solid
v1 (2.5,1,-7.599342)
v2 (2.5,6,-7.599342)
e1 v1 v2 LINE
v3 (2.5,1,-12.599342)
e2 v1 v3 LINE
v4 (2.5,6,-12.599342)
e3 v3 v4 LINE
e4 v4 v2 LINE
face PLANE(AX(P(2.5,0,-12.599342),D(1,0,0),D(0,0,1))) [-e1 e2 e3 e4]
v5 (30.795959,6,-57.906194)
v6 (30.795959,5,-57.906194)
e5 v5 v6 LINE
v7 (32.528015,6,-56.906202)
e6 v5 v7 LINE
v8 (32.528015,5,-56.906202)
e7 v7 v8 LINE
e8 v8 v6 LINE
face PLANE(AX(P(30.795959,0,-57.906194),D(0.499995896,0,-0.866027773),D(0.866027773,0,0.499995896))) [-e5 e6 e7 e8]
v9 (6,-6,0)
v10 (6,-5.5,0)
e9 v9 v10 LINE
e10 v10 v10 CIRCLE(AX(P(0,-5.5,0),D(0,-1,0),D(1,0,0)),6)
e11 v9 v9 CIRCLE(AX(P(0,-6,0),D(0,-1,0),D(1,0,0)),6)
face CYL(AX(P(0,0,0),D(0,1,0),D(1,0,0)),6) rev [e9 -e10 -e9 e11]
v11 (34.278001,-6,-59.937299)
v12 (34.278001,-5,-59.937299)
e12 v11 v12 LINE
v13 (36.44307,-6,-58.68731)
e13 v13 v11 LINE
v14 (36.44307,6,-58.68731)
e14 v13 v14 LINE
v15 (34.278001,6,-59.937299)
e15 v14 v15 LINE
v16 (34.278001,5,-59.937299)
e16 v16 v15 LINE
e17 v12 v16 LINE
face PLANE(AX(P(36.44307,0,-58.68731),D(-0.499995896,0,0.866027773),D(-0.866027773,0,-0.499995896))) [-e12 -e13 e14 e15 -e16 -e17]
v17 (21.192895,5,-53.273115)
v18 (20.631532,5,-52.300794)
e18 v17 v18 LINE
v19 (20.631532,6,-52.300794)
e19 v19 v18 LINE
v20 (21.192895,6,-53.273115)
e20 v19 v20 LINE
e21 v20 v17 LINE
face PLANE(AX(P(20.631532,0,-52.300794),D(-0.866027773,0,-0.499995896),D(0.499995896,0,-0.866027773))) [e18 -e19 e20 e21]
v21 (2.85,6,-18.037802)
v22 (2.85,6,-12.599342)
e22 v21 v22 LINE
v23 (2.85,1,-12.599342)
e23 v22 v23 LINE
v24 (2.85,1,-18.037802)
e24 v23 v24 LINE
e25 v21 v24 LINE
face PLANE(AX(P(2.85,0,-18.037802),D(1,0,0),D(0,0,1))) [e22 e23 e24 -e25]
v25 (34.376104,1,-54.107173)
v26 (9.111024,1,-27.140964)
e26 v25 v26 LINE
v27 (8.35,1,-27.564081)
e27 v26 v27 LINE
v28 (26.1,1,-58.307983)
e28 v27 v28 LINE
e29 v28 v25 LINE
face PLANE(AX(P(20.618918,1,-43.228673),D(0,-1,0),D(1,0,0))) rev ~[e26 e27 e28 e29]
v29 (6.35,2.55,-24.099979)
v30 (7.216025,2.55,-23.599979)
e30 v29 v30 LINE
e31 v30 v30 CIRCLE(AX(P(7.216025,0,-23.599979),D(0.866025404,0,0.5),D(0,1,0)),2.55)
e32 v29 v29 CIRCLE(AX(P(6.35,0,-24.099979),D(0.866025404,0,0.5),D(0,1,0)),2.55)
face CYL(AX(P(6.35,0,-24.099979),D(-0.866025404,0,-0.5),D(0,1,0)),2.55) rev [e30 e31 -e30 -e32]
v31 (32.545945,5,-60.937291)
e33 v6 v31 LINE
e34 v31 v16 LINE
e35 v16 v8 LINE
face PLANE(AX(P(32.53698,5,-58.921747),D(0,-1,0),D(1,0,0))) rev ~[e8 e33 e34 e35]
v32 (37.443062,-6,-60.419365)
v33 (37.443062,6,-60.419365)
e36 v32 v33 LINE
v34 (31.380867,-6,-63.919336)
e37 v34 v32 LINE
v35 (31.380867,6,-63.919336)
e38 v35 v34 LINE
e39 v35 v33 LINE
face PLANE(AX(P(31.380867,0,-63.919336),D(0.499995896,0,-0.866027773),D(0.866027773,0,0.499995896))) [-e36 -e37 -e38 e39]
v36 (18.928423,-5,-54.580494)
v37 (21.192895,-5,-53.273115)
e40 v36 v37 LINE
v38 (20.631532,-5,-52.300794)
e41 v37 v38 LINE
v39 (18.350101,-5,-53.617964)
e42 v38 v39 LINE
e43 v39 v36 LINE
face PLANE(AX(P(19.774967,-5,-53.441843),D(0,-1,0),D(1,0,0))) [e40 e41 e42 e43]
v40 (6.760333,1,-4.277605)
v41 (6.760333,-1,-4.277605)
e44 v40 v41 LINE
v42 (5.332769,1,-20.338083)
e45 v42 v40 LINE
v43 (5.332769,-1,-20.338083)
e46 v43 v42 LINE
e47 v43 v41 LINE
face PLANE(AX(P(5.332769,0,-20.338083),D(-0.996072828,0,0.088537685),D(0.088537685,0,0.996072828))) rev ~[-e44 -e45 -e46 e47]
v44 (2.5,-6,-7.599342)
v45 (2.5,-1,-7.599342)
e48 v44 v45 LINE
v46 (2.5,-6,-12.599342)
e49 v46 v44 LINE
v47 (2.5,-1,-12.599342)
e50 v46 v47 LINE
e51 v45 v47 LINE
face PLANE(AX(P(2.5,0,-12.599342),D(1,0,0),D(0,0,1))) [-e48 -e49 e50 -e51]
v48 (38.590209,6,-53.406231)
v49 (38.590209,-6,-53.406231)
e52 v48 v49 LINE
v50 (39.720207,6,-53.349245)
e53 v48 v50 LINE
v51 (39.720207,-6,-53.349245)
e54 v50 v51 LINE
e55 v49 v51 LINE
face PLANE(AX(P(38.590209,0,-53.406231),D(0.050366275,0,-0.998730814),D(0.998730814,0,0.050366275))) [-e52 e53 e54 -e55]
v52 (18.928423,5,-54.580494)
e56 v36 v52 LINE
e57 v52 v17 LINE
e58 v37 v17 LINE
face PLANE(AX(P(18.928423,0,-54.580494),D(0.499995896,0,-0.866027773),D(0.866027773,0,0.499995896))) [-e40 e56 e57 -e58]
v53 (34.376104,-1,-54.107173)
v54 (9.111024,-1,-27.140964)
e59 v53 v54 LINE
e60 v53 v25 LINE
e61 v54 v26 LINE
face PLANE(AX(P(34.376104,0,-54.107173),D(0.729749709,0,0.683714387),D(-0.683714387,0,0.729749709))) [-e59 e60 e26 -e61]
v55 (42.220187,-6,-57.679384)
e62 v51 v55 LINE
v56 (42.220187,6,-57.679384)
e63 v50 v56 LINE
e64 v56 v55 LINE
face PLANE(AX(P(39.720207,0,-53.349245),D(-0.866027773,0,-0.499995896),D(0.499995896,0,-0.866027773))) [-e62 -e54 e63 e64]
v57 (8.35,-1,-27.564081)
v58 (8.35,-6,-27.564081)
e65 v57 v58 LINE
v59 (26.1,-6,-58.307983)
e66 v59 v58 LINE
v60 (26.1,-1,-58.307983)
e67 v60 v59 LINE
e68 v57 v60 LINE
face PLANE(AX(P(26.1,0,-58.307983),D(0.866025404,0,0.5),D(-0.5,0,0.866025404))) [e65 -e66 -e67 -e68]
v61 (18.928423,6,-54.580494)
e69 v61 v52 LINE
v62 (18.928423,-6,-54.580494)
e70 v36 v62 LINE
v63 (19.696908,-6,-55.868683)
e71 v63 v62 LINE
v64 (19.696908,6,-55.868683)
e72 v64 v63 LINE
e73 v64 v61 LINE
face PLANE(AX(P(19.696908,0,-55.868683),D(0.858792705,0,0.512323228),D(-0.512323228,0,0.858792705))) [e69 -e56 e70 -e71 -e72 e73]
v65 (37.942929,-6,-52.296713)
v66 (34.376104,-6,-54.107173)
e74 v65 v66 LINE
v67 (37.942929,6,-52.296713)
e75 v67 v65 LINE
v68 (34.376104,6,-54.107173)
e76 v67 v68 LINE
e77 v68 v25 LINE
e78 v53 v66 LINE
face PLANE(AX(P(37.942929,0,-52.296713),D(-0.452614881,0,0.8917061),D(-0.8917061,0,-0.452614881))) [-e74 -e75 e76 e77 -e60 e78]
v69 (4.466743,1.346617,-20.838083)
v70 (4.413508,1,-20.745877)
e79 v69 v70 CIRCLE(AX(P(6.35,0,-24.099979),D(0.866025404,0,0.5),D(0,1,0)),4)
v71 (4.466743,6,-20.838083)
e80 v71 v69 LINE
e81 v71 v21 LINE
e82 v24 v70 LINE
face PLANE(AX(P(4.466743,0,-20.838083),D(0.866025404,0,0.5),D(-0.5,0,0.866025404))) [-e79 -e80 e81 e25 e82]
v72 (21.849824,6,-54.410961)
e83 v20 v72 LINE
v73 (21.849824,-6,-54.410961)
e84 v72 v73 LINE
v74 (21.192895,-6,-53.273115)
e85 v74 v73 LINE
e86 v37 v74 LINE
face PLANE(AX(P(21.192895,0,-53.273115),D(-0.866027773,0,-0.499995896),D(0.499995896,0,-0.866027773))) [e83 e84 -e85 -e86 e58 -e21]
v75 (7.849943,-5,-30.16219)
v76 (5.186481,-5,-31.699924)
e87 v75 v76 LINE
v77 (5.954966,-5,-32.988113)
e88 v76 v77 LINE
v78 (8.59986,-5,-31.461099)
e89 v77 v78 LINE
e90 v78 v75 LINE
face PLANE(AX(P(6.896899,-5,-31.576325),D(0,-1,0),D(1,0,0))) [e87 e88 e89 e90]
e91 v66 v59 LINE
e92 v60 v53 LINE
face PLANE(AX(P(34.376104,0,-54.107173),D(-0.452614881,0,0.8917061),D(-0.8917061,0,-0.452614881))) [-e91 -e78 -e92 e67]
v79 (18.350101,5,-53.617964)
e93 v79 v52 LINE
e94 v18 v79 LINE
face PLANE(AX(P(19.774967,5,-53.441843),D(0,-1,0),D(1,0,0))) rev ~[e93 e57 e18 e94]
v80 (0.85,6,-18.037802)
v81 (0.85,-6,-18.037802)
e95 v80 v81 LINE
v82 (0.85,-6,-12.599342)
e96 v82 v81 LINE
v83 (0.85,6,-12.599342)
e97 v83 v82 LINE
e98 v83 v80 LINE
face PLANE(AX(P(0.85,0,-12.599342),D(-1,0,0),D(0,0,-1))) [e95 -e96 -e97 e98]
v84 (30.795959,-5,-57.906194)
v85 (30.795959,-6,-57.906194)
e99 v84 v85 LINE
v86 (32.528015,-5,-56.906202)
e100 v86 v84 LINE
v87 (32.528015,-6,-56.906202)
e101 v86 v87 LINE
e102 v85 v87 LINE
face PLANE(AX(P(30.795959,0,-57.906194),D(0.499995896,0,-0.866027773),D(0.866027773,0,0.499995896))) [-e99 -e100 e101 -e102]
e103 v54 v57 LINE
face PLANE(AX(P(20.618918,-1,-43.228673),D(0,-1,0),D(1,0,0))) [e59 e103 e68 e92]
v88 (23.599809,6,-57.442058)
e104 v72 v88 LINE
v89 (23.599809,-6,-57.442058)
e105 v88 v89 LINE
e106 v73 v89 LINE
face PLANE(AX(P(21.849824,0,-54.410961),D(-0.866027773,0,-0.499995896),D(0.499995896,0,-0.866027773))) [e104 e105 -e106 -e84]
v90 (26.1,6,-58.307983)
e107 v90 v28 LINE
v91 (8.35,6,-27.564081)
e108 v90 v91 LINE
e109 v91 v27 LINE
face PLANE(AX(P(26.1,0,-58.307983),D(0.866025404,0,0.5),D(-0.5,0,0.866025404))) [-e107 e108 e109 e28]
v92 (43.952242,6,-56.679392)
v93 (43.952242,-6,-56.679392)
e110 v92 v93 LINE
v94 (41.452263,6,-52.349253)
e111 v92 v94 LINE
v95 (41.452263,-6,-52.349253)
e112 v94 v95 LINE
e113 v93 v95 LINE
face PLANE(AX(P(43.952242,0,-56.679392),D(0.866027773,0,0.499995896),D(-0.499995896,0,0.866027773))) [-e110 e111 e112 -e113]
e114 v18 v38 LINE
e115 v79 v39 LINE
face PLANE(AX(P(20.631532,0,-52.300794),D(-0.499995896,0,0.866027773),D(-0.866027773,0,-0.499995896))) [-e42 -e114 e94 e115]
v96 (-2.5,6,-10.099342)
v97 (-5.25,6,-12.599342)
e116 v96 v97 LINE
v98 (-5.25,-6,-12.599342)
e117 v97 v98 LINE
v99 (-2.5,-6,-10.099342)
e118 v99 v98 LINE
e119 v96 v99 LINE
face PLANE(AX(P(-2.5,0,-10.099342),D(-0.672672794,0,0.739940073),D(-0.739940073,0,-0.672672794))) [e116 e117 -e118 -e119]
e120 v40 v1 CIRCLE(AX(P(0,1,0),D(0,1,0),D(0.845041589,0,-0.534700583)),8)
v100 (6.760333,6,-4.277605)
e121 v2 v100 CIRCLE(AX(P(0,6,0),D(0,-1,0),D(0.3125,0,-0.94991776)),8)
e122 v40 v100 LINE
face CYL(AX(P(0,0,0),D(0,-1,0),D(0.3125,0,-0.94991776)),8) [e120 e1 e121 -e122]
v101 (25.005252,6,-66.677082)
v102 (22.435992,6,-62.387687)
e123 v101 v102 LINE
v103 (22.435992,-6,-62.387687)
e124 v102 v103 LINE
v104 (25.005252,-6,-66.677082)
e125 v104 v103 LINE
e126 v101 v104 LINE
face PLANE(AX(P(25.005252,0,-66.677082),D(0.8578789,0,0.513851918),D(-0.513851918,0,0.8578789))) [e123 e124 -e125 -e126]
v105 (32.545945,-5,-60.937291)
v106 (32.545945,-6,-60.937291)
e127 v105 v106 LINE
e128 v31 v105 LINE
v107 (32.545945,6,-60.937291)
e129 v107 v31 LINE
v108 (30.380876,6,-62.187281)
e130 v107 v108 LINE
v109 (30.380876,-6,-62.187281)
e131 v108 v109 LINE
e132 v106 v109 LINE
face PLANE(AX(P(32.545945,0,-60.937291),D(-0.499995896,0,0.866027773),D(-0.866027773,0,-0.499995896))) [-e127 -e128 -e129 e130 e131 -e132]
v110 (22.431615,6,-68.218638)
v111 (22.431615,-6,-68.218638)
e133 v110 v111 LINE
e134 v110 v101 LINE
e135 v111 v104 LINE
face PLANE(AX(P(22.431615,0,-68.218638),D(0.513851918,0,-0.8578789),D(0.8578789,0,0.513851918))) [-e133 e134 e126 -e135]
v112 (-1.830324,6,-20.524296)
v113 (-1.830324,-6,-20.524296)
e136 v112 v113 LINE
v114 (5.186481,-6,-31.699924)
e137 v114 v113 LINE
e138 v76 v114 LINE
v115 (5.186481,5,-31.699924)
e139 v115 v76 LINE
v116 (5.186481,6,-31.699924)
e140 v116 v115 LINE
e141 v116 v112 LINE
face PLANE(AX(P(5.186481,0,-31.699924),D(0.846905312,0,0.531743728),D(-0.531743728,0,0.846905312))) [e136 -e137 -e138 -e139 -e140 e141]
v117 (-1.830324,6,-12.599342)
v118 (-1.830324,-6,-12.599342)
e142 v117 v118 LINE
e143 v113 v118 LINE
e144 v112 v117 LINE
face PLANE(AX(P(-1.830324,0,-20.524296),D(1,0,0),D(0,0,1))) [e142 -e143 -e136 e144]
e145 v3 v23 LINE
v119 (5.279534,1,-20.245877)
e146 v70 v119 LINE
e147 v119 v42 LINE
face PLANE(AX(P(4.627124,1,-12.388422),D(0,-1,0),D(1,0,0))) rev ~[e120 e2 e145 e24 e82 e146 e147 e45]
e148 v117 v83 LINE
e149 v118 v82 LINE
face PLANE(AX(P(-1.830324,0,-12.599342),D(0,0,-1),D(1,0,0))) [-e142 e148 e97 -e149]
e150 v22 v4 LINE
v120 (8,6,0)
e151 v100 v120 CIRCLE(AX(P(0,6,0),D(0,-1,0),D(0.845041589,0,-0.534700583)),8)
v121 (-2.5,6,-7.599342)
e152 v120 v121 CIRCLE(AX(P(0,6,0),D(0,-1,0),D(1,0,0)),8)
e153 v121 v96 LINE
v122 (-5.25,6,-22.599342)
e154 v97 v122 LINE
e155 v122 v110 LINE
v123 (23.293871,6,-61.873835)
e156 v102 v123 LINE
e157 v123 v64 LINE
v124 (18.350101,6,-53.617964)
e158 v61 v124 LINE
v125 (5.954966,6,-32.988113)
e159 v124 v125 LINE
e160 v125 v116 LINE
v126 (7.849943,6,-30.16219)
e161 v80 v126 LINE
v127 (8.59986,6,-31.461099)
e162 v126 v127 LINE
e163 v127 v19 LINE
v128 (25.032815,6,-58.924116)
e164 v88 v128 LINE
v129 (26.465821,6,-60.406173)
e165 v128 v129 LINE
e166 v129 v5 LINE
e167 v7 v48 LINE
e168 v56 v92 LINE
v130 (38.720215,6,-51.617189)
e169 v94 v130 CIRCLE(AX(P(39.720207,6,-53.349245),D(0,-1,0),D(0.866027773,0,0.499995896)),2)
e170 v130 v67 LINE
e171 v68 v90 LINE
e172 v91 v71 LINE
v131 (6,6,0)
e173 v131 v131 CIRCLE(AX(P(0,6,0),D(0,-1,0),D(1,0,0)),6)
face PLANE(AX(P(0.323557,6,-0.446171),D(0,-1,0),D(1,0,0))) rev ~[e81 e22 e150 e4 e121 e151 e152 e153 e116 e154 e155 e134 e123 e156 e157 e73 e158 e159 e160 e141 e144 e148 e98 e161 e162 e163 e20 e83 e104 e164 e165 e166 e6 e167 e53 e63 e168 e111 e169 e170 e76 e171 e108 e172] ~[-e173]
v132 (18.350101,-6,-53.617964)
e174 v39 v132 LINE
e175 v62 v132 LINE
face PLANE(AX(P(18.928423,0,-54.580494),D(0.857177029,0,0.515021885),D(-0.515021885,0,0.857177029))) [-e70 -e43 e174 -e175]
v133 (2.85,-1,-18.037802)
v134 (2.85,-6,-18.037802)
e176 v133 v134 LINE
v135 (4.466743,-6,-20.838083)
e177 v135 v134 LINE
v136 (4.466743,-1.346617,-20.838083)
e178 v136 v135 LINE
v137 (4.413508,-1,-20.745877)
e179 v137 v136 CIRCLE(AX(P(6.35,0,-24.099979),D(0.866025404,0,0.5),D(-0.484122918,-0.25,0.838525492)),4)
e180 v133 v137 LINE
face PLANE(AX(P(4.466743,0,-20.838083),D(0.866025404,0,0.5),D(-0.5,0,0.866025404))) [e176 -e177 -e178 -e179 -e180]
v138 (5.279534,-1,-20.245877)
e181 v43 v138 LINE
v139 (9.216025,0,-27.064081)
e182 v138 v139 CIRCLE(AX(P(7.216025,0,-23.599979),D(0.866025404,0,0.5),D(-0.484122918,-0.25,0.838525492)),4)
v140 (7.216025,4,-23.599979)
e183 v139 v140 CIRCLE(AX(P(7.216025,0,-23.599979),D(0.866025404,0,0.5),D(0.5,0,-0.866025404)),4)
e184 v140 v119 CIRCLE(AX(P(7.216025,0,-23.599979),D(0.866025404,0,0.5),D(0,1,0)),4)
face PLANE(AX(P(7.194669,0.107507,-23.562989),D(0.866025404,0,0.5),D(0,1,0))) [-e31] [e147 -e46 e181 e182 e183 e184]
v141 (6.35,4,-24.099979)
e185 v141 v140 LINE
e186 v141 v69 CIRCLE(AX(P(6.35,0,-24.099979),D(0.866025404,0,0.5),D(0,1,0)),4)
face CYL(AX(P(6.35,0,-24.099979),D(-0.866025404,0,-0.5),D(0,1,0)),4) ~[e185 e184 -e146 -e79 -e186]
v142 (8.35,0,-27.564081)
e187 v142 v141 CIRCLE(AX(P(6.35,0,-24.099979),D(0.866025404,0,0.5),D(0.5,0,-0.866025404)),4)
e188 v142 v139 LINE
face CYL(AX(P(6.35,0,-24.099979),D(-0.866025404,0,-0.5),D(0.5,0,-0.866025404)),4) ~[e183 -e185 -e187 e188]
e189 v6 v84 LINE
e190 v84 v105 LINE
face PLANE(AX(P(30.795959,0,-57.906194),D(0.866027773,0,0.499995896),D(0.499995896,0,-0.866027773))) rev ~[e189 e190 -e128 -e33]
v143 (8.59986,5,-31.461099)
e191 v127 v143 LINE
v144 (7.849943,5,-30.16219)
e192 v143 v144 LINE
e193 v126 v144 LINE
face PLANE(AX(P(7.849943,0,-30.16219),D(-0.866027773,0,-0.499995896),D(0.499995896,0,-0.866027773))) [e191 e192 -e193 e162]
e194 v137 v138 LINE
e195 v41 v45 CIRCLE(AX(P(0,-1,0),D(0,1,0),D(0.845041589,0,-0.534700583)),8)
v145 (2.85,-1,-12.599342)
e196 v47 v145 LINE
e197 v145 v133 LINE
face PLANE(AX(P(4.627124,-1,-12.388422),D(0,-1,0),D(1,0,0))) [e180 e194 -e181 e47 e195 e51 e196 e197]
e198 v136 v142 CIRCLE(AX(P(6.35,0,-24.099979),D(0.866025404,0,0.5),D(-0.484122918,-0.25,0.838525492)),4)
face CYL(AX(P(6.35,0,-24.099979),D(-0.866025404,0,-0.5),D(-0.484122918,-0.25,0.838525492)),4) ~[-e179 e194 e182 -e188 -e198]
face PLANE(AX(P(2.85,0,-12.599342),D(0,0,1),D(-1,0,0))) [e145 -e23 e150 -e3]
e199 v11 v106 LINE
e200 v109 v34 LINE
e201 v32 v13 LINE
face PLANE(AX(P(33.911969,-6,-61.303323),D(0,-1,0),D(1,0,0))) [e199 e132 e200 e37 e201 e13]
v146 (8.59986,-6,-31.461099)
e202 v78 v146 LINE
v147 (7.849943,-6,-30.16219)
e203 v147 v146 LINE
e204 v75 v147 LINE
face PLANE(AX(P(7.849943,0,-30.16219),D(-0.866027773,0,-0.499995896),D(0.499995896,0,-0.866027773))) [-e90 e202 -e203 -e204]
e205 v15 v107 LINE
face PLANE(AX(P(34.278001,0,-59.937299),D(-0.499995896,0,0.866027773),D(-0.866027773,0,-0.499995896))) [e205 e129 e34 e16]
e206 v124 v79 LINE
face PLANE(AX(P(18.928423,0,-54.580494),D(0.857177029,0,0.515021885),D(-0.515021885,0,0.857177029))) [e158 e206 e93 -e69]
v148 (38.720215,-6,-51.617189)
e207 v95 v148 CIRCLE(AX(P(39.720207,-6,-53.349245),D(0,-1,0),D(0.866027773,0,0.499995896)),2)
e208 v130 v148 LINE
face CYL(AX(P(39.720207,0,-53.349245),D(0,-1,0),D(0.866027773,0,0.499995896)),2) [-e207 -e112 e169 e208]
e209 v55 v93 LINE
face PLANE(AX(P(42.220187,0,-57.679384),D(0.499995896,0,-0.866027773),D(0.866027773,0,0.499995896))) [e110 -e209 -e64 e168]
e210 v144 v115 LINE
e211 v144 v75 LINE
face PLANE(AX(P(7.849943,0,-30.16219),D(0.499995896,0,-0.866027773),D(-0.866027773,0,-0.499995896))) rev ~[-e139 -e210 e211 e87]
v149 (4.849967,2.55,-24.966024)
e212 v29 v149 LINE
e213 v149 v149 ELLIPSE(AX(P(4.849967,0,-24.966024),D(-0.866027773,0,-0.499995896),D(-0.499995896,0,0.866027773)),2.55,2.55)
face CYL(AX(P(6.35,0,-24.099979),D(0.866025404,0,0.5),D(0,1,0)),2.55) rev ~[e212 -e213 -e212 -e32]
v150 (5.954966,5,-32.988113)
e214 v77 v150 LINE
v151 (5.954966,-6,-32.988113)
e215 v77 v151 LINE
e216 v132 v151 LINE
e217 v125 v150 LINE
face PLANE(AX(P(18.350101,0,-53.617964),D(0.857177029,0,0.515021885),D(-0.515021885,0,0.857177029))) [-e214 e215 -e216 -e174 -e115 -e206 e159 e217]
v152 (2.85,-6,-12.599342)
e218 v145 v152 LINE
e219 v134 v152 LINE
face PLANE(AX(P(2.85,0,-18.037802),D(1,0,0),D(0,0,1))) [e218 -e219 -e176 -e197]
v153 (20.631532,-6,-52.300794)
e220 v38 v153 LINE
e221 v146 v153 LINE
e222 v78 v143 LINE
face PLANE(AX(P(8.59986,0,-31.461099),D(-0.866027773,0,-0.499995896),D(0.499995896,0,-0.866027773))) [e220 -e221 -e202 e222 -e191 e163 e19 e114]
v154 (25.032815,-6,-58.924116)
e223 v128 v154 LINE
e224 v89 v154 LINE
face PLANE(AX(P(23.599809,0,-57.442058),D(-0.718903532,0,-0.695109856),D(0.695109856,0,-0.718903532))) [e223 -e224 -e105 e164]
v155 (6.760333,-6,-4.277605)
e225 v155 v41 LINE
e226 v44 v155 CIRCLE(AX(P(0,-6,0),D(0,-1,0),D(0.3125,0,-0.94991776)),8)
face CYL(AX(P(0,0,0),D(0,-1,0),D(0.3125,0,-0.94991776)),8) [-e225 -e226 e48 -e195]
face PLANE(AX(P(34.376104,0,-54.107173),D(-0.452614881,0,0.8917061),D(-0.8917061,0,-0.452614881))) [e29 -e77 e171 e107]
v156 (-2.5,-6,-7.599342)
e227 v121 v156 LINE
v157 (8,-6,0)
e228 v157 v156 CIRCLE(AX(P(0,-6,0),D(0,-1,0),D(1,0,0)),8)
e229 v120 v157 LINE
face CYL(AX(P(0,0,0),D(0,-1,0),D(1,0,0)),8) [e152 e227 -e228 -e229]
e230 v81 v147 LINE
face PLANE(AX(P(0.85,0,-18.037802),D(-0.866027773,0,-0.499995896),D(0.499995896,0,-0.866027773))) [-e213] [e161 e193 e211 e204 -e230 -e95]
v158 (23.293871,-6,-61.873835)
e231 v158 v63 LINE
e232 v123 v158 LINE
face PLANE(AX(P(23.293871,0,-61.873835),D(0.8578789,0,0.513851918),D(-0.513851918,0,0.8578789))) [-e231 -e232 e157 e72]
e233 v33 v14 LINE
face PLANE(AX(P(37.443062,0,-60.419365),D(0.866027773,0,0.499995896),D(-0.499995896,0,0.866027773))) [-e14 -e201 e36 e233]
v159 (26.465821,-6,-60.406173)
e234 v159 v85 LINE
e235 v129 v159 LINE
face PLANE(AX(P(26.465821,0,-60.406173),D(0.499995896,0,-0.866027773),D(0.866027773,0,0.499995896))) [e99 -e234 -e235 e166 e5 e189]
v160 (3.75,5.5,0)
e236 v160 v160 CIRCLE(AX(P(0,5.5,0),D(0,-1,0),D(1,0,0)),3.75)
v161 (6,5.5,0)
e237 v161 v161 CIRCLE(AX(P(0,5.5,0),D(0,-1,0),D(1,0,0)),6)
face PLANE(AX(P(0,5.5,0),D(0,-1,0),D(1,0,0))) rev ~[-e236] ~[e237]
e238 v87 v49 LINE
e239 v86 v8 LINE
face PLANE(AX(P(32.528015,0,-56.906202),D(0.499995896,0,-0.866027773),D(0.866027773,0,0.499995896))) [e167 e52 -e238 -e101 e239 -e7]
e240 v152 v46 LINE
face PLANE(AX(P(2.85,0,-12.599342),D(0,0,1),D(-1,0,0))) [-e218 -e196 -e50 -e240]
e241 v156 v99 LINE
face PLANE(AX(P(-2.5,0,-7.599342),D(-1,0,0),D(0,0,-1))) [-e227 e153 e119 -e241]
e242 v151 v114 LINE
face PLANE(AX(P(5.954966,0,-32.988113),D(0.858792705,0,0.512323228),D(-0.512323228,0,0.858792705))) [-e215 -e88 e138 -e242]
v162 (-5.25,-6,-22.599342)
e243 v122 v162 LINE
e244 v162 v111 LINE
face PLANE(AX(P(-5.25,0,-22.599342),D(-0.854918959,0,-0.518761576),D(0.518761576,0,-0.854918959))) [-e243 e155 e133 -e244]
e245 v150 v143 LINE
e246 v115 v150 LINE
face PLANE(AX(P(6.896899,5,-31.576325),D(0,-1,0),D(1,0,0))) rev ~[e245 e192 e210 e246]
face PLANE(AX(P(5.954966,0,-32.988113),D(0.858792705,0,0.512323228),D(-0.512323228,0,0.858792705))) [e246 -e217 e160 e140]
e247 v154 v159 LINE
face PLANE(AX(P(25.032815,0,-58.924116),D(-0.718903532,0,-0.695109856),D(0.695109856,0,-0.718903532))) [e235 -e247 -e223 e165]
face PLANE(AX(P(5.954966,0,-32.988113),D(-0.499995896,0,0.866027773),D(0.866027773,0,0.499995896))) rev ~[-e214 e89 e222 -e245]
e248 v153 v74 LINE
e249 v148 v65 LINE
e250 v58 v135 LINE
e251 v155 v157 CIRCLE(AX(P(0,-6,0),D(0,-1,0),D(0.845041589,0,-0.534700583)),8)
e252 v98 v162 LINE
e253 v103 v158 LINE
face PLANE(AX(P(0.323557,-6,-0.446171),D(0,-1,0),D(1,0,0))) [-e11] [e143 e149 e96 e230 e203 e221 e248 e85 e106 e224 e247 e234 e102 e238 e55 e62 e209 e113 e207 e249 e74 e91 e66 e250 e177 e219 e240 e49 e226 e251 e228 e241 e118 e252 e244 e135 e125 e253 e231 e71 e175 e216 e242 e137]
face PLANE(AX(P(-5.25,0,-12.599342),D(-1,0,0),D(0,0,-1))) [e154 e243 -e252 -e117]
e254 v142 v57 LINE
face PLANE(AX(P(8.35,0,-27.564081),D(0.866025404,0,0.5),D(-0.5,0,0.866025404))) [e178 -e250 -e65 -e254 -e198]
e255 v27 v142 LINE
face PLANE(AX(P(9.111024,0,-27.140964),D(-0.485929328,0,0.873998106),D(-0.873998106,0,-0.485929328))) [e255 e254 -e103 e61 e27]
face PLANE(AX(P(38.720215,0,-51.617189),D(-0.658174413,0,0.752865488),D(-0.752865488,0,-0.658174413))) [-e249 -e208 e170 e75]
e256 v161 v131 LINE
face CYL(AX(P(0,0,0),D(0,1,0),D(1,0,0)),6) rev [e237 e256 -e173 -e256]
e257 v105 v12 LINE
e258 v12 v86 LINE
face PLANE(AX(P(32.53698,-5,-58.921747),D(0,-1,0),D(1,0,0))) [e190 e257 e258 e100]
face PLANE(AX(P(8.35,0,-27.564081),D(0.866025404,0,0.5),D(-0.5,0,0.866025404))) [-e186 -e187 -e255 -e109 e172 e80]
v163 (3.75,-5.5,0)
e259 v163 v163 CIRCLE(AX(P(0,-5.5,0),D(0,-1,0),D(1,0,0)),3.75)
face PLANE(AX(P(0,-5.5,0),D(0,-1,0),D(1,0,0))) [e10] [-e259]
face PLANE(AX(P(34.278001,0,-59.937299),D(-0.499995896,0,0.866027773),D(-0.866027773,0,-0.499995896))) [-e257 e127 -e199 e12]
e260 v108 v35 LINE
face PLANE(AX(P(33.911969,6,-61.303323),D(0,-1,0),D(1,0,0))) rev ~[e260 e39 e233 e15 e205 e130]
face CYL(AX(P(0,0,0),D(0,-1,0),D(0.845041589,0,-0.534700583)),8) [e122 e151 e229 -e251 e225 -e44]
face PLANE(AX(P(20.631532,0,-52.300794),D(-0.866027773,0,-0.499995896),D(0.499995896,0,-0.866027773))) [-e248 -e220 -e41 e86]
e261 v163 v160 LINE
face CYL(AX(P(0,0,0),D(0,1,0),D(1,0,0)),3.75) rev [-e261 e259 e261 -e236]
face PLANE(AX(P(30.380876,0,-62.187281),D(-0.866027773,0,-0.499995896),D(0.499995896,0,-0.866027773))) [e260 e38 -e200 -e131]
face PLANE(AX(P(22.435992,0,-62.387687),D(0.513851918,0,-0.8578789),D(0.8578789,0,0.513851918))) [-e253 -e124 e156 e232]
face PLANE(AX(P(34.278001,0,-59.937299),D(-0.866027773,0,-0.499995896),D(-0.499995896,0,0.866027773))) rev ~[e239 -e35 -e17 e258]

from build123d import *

# Parameters (mm, degrees)
F0_R     = 6
F1_DEPTH = 6
F2_DEPTH = 5
F0_R_2   = 3.75
F3_DEPTH = 5.5
F4_DEPTH = 1
F5_R     = 2.55
F6_DEPTH = 1
F7_DEPTH = 3


# Not quite as in the source:
# - a feature names something its author has since deleted; it is built from what else it names


with BuildPart() as f1:
    # F0 (on Front) → F1 (new body, symmetric)
    with BuildSketch(Plane.XZ):
        with BuildLine():
            ThreePointArc((6.7603327111, -4.2776046609), (7.6838356857, -2.2268069417), (8, 0))
            ThreePointArc((8, 0), (-4.6904157598, 6.4807406984), (-2.5, -7.5993420768))
            ThreePointArc((-2.5, -7.5993420768), (0, -8), (2.5, -7.5993420768))
            ThreePointArc((2.5, -7.5993420768), (4.9190370343, -6.3089677963), (6.7603327111, -4.2776046609))
        make_face()
        Circle(F0_R, mode=Mode.SUBTRACT)
        with BuildLine():
            ThreePointArc((2.5, -7.5993420768), (0, -8), (-2.5, -7.5993420768))
            Line((-2.5, -7.5993420768), (-2.5, -10.0993420768))
            Line((-2.5, -10.0993420768), (-2.5, -12.5993420768))
            Line((-2.5, -12.5993420768), (-1.8303241628, -12.5993420768))
            Line((-1.8303241628, -12.5993420768), (-1.25, -12.5993420768))
            Line((-1.25, -12.5993420768), (0, -12.5993420768))
            Line((0, -12.5993420768), (0.85, -12.5993420768))
            Line((0.85, -12.5993420768), (2.5, -12.5993420768))
            Line((2.5, -12.5993420768), (2.5, -7.5993420768))
        make_face()
        Polygon((-2.5, -12.5993420768), (-2.5, -10.0993420768), (-5.25, -12.5993420768), align=None)
        Polygon((2.85, -12.5993420768), (2.5, -12.5993420768), (0.85, -12.5993420768), (0.85, -18.0378015974), (2.85, -18.0378015974), align=None)
        Polygon((8.3499999998, -27.5640810386), (4.4667434126, -20.8380833309), (2.85, -18.0378015974), (0.85, -18.0378015974), (7.8499425387, -30.1621904255), (8.5998597667, -31.4610993824), (20.6315315697, -52.3007943349), (21.192894901, -53.2731147882), (21.8498235115, -54.4109609722), (23.5998091461, -57.4420581792), (25.0328148241, -58.9241157783), (26.1, -58.3079828733), align=None)
        with BuildLine():
            ThreePointArc((41.4522628248, -52.3492529341), (40.2378545238, -51.4173955261), (38.7202154867, -51.6171891785))
            Line((38.7202154867, -51.6171891785), (39.720207278, -53.3492447254))
            Line((39.720207278, -53.3492447254), (41.4522628248, -52.3492529341))
        make_face()
        Polygon((41.4522628248, -52.3492529341), (39.720207278, -53.3492447254), (42.2201867561, -57.6793835925), (43.9522423029, -56.6793918013), align=None)
        Polygon((-1.8303241628, -12.5993420768), (-2.5, -12.5993420768), (-5.25, -12.5993420768), (-5.25, -22.5993420768), (-1.8303241628, -20.5242957716), align=None)
        Polygon((-1.8303241628, -20.5242957716), (-5.25, -22.5993420768), (22.4316151512, -68.2186375255), (25.0052518507, -66.6770817727), (22.4359922626, -62.3876872736), (23.2938711624, -61.8738353559), (19.6969077391, -55.8686830572), (18.9284228965, -54.5804940001), (18.3501014099, -53.6179642353), (5.9549663233, -32.9881126107), (5.1864814807, -31.6999235536), align=None)
        Polygon((34.376104393, -54.107172761), (26.1, -58.3079828733), (25.0328148241, -58.9241157783), (26.4658205021, -60.4061733773), (30.7959593692, -57.9061938992), (32.5280149161, -56.906202108), (38.5902093302, -53.4062308387), (39.720207278, -53.3492447254), (38.7202154867, -51.6171891785), (37.9429287948, -52.2967132374), align=None)
    extrude(amount=F1_DEPTH, both=True)



with BuildPart() as f1b:
    # F0 (on Front) → F1, piece 2 (new body, symmetric)
    with BuildSketch(Plane.XZ):
        Polygon((34.2780005508, -59.937299315), (32.5459450039, -60.9372911063), (30.3808755703, -62.1872808453), (31.3808673616, -63.9193363922), (37.4430617756, -60.4193651228), (36.4430699844, -58.687309576), align=None)
    extrude(amount=F1_DEPTH, both=True)


with BuildPart() as f1_1:
    add(f1.part)

    add(f1b.part)  # F2 merges F1b
    # F0 (on Front) → F2 (join, symmetric)
    with BuildSketch(Plane.XZ):
        Polygon((32.5280149161, -56.906202108), (30.7959593692, -57.9061938992), (32.5459450039, -60.9372911063), (34.2780005508, -59.937299315), align=None)
        Polygon((8.5998597667, -31.4610993824), (7.8499425387, -30.1621904255), (5.1864814807, -31.6999235536), (5.9549663233, -32.9881126107), align=None)
        Polygon((21.192894901, -53.2731147882), (20.6315315697, -52.3007943349), (18.3501014099, -53.6179642353), (18.9284228965, -54.5804940001), align=None)
    extrude(amount=F2_DEPTH, both=True)

    # F0 (on Front) → F3 (join, symmetric)
    with BuildSketch(Plane.XZ):
        Circle(F0_R)
        Circle(F0_R_2, mode=Mode.SUBTRACT)
    extrude(amount=F3_DEPTH, both=True)

    # F0 (on Front) → F4 (join, symmetric)
    with BuildSketch(Plane.XZ):
        with BuildLine():
            Line((5.3327688164, -20.3380833309), (6.7603327111, -4.2776046609))
            ThreePointArc((6.7603327111, -4.2776046609), (4.9190370343, -6.3089677963), (2.5, -7.5993420768))
            Line((2.5, -7.5993420768), (2.5, -12.5993420768))
            Line((2.5, -12.5993420768), (2.85, -12.5993420768))
            Line((2.85, -12.5993420768), (2.85, -18.0378015974))
            Line((2.85, -18.0378015974), (4.4667434126, -20.8380833309))
            Line((4.4667434126, -20.8380833309), (5.3327688164, -20.3380833309))
        make_face()
        Polygon((9.1110238739, -27.1409636232), (8.3499999998, -27.5640810386), (26.1, -58.3079828733), (34.376104393, -54.107172761), align=None)
    extrude(amount=F4_DEPTH, both=True)

    # F5 (on face) → F6 (join)
    with BuildSketch(Plane(origin=(-5.6730972059, 0, -3.2753641989), x_dir=(0, 1, 0), z_dir=(0.8660254038, 0, 0.5))):
        with BuildLine():
            ThreePointArc((0, -28.0461944113), (2.8284271247, -26.8746215361), (4, -24.0461944113))
            ThreePointArc((4, -24.0461944113), (3.1622776602, -21.5967046686), (1, -20.1732110651))
            Line((1, -20.1732110651), (1, -20.279681237))
            Line((1, -20.279681237), (-1, -20.279681237))
            Line((-1, -20.279681237), (-1, -20.1732110651))
            ThreePointArc((-1, -20.1732110651), (-3.9681187851, -24.5502115813), (0, -28.0461944113))
        make_face()
        with Locations((0, -24.0461944113)):
            Circle(F5_R, mode=Mode.SUBTRACT)
    extrude(amount=F6_DEPTH)

    # F5 (on face) → F7 (cut)
    with BuildSketch(Plane(origin=(-5.6730972059, 0, -3.2753641989), x_dir=(0, 1, 0), z_dir=(0.8660254038, 0, 0.5))):
        with Locations((0, -24.0461944113)):
            Circle(F5_R)
    extrude(amount=-F7_DEPTH, mode=Mode.SUBTRACT)


solid = f1_1.part
